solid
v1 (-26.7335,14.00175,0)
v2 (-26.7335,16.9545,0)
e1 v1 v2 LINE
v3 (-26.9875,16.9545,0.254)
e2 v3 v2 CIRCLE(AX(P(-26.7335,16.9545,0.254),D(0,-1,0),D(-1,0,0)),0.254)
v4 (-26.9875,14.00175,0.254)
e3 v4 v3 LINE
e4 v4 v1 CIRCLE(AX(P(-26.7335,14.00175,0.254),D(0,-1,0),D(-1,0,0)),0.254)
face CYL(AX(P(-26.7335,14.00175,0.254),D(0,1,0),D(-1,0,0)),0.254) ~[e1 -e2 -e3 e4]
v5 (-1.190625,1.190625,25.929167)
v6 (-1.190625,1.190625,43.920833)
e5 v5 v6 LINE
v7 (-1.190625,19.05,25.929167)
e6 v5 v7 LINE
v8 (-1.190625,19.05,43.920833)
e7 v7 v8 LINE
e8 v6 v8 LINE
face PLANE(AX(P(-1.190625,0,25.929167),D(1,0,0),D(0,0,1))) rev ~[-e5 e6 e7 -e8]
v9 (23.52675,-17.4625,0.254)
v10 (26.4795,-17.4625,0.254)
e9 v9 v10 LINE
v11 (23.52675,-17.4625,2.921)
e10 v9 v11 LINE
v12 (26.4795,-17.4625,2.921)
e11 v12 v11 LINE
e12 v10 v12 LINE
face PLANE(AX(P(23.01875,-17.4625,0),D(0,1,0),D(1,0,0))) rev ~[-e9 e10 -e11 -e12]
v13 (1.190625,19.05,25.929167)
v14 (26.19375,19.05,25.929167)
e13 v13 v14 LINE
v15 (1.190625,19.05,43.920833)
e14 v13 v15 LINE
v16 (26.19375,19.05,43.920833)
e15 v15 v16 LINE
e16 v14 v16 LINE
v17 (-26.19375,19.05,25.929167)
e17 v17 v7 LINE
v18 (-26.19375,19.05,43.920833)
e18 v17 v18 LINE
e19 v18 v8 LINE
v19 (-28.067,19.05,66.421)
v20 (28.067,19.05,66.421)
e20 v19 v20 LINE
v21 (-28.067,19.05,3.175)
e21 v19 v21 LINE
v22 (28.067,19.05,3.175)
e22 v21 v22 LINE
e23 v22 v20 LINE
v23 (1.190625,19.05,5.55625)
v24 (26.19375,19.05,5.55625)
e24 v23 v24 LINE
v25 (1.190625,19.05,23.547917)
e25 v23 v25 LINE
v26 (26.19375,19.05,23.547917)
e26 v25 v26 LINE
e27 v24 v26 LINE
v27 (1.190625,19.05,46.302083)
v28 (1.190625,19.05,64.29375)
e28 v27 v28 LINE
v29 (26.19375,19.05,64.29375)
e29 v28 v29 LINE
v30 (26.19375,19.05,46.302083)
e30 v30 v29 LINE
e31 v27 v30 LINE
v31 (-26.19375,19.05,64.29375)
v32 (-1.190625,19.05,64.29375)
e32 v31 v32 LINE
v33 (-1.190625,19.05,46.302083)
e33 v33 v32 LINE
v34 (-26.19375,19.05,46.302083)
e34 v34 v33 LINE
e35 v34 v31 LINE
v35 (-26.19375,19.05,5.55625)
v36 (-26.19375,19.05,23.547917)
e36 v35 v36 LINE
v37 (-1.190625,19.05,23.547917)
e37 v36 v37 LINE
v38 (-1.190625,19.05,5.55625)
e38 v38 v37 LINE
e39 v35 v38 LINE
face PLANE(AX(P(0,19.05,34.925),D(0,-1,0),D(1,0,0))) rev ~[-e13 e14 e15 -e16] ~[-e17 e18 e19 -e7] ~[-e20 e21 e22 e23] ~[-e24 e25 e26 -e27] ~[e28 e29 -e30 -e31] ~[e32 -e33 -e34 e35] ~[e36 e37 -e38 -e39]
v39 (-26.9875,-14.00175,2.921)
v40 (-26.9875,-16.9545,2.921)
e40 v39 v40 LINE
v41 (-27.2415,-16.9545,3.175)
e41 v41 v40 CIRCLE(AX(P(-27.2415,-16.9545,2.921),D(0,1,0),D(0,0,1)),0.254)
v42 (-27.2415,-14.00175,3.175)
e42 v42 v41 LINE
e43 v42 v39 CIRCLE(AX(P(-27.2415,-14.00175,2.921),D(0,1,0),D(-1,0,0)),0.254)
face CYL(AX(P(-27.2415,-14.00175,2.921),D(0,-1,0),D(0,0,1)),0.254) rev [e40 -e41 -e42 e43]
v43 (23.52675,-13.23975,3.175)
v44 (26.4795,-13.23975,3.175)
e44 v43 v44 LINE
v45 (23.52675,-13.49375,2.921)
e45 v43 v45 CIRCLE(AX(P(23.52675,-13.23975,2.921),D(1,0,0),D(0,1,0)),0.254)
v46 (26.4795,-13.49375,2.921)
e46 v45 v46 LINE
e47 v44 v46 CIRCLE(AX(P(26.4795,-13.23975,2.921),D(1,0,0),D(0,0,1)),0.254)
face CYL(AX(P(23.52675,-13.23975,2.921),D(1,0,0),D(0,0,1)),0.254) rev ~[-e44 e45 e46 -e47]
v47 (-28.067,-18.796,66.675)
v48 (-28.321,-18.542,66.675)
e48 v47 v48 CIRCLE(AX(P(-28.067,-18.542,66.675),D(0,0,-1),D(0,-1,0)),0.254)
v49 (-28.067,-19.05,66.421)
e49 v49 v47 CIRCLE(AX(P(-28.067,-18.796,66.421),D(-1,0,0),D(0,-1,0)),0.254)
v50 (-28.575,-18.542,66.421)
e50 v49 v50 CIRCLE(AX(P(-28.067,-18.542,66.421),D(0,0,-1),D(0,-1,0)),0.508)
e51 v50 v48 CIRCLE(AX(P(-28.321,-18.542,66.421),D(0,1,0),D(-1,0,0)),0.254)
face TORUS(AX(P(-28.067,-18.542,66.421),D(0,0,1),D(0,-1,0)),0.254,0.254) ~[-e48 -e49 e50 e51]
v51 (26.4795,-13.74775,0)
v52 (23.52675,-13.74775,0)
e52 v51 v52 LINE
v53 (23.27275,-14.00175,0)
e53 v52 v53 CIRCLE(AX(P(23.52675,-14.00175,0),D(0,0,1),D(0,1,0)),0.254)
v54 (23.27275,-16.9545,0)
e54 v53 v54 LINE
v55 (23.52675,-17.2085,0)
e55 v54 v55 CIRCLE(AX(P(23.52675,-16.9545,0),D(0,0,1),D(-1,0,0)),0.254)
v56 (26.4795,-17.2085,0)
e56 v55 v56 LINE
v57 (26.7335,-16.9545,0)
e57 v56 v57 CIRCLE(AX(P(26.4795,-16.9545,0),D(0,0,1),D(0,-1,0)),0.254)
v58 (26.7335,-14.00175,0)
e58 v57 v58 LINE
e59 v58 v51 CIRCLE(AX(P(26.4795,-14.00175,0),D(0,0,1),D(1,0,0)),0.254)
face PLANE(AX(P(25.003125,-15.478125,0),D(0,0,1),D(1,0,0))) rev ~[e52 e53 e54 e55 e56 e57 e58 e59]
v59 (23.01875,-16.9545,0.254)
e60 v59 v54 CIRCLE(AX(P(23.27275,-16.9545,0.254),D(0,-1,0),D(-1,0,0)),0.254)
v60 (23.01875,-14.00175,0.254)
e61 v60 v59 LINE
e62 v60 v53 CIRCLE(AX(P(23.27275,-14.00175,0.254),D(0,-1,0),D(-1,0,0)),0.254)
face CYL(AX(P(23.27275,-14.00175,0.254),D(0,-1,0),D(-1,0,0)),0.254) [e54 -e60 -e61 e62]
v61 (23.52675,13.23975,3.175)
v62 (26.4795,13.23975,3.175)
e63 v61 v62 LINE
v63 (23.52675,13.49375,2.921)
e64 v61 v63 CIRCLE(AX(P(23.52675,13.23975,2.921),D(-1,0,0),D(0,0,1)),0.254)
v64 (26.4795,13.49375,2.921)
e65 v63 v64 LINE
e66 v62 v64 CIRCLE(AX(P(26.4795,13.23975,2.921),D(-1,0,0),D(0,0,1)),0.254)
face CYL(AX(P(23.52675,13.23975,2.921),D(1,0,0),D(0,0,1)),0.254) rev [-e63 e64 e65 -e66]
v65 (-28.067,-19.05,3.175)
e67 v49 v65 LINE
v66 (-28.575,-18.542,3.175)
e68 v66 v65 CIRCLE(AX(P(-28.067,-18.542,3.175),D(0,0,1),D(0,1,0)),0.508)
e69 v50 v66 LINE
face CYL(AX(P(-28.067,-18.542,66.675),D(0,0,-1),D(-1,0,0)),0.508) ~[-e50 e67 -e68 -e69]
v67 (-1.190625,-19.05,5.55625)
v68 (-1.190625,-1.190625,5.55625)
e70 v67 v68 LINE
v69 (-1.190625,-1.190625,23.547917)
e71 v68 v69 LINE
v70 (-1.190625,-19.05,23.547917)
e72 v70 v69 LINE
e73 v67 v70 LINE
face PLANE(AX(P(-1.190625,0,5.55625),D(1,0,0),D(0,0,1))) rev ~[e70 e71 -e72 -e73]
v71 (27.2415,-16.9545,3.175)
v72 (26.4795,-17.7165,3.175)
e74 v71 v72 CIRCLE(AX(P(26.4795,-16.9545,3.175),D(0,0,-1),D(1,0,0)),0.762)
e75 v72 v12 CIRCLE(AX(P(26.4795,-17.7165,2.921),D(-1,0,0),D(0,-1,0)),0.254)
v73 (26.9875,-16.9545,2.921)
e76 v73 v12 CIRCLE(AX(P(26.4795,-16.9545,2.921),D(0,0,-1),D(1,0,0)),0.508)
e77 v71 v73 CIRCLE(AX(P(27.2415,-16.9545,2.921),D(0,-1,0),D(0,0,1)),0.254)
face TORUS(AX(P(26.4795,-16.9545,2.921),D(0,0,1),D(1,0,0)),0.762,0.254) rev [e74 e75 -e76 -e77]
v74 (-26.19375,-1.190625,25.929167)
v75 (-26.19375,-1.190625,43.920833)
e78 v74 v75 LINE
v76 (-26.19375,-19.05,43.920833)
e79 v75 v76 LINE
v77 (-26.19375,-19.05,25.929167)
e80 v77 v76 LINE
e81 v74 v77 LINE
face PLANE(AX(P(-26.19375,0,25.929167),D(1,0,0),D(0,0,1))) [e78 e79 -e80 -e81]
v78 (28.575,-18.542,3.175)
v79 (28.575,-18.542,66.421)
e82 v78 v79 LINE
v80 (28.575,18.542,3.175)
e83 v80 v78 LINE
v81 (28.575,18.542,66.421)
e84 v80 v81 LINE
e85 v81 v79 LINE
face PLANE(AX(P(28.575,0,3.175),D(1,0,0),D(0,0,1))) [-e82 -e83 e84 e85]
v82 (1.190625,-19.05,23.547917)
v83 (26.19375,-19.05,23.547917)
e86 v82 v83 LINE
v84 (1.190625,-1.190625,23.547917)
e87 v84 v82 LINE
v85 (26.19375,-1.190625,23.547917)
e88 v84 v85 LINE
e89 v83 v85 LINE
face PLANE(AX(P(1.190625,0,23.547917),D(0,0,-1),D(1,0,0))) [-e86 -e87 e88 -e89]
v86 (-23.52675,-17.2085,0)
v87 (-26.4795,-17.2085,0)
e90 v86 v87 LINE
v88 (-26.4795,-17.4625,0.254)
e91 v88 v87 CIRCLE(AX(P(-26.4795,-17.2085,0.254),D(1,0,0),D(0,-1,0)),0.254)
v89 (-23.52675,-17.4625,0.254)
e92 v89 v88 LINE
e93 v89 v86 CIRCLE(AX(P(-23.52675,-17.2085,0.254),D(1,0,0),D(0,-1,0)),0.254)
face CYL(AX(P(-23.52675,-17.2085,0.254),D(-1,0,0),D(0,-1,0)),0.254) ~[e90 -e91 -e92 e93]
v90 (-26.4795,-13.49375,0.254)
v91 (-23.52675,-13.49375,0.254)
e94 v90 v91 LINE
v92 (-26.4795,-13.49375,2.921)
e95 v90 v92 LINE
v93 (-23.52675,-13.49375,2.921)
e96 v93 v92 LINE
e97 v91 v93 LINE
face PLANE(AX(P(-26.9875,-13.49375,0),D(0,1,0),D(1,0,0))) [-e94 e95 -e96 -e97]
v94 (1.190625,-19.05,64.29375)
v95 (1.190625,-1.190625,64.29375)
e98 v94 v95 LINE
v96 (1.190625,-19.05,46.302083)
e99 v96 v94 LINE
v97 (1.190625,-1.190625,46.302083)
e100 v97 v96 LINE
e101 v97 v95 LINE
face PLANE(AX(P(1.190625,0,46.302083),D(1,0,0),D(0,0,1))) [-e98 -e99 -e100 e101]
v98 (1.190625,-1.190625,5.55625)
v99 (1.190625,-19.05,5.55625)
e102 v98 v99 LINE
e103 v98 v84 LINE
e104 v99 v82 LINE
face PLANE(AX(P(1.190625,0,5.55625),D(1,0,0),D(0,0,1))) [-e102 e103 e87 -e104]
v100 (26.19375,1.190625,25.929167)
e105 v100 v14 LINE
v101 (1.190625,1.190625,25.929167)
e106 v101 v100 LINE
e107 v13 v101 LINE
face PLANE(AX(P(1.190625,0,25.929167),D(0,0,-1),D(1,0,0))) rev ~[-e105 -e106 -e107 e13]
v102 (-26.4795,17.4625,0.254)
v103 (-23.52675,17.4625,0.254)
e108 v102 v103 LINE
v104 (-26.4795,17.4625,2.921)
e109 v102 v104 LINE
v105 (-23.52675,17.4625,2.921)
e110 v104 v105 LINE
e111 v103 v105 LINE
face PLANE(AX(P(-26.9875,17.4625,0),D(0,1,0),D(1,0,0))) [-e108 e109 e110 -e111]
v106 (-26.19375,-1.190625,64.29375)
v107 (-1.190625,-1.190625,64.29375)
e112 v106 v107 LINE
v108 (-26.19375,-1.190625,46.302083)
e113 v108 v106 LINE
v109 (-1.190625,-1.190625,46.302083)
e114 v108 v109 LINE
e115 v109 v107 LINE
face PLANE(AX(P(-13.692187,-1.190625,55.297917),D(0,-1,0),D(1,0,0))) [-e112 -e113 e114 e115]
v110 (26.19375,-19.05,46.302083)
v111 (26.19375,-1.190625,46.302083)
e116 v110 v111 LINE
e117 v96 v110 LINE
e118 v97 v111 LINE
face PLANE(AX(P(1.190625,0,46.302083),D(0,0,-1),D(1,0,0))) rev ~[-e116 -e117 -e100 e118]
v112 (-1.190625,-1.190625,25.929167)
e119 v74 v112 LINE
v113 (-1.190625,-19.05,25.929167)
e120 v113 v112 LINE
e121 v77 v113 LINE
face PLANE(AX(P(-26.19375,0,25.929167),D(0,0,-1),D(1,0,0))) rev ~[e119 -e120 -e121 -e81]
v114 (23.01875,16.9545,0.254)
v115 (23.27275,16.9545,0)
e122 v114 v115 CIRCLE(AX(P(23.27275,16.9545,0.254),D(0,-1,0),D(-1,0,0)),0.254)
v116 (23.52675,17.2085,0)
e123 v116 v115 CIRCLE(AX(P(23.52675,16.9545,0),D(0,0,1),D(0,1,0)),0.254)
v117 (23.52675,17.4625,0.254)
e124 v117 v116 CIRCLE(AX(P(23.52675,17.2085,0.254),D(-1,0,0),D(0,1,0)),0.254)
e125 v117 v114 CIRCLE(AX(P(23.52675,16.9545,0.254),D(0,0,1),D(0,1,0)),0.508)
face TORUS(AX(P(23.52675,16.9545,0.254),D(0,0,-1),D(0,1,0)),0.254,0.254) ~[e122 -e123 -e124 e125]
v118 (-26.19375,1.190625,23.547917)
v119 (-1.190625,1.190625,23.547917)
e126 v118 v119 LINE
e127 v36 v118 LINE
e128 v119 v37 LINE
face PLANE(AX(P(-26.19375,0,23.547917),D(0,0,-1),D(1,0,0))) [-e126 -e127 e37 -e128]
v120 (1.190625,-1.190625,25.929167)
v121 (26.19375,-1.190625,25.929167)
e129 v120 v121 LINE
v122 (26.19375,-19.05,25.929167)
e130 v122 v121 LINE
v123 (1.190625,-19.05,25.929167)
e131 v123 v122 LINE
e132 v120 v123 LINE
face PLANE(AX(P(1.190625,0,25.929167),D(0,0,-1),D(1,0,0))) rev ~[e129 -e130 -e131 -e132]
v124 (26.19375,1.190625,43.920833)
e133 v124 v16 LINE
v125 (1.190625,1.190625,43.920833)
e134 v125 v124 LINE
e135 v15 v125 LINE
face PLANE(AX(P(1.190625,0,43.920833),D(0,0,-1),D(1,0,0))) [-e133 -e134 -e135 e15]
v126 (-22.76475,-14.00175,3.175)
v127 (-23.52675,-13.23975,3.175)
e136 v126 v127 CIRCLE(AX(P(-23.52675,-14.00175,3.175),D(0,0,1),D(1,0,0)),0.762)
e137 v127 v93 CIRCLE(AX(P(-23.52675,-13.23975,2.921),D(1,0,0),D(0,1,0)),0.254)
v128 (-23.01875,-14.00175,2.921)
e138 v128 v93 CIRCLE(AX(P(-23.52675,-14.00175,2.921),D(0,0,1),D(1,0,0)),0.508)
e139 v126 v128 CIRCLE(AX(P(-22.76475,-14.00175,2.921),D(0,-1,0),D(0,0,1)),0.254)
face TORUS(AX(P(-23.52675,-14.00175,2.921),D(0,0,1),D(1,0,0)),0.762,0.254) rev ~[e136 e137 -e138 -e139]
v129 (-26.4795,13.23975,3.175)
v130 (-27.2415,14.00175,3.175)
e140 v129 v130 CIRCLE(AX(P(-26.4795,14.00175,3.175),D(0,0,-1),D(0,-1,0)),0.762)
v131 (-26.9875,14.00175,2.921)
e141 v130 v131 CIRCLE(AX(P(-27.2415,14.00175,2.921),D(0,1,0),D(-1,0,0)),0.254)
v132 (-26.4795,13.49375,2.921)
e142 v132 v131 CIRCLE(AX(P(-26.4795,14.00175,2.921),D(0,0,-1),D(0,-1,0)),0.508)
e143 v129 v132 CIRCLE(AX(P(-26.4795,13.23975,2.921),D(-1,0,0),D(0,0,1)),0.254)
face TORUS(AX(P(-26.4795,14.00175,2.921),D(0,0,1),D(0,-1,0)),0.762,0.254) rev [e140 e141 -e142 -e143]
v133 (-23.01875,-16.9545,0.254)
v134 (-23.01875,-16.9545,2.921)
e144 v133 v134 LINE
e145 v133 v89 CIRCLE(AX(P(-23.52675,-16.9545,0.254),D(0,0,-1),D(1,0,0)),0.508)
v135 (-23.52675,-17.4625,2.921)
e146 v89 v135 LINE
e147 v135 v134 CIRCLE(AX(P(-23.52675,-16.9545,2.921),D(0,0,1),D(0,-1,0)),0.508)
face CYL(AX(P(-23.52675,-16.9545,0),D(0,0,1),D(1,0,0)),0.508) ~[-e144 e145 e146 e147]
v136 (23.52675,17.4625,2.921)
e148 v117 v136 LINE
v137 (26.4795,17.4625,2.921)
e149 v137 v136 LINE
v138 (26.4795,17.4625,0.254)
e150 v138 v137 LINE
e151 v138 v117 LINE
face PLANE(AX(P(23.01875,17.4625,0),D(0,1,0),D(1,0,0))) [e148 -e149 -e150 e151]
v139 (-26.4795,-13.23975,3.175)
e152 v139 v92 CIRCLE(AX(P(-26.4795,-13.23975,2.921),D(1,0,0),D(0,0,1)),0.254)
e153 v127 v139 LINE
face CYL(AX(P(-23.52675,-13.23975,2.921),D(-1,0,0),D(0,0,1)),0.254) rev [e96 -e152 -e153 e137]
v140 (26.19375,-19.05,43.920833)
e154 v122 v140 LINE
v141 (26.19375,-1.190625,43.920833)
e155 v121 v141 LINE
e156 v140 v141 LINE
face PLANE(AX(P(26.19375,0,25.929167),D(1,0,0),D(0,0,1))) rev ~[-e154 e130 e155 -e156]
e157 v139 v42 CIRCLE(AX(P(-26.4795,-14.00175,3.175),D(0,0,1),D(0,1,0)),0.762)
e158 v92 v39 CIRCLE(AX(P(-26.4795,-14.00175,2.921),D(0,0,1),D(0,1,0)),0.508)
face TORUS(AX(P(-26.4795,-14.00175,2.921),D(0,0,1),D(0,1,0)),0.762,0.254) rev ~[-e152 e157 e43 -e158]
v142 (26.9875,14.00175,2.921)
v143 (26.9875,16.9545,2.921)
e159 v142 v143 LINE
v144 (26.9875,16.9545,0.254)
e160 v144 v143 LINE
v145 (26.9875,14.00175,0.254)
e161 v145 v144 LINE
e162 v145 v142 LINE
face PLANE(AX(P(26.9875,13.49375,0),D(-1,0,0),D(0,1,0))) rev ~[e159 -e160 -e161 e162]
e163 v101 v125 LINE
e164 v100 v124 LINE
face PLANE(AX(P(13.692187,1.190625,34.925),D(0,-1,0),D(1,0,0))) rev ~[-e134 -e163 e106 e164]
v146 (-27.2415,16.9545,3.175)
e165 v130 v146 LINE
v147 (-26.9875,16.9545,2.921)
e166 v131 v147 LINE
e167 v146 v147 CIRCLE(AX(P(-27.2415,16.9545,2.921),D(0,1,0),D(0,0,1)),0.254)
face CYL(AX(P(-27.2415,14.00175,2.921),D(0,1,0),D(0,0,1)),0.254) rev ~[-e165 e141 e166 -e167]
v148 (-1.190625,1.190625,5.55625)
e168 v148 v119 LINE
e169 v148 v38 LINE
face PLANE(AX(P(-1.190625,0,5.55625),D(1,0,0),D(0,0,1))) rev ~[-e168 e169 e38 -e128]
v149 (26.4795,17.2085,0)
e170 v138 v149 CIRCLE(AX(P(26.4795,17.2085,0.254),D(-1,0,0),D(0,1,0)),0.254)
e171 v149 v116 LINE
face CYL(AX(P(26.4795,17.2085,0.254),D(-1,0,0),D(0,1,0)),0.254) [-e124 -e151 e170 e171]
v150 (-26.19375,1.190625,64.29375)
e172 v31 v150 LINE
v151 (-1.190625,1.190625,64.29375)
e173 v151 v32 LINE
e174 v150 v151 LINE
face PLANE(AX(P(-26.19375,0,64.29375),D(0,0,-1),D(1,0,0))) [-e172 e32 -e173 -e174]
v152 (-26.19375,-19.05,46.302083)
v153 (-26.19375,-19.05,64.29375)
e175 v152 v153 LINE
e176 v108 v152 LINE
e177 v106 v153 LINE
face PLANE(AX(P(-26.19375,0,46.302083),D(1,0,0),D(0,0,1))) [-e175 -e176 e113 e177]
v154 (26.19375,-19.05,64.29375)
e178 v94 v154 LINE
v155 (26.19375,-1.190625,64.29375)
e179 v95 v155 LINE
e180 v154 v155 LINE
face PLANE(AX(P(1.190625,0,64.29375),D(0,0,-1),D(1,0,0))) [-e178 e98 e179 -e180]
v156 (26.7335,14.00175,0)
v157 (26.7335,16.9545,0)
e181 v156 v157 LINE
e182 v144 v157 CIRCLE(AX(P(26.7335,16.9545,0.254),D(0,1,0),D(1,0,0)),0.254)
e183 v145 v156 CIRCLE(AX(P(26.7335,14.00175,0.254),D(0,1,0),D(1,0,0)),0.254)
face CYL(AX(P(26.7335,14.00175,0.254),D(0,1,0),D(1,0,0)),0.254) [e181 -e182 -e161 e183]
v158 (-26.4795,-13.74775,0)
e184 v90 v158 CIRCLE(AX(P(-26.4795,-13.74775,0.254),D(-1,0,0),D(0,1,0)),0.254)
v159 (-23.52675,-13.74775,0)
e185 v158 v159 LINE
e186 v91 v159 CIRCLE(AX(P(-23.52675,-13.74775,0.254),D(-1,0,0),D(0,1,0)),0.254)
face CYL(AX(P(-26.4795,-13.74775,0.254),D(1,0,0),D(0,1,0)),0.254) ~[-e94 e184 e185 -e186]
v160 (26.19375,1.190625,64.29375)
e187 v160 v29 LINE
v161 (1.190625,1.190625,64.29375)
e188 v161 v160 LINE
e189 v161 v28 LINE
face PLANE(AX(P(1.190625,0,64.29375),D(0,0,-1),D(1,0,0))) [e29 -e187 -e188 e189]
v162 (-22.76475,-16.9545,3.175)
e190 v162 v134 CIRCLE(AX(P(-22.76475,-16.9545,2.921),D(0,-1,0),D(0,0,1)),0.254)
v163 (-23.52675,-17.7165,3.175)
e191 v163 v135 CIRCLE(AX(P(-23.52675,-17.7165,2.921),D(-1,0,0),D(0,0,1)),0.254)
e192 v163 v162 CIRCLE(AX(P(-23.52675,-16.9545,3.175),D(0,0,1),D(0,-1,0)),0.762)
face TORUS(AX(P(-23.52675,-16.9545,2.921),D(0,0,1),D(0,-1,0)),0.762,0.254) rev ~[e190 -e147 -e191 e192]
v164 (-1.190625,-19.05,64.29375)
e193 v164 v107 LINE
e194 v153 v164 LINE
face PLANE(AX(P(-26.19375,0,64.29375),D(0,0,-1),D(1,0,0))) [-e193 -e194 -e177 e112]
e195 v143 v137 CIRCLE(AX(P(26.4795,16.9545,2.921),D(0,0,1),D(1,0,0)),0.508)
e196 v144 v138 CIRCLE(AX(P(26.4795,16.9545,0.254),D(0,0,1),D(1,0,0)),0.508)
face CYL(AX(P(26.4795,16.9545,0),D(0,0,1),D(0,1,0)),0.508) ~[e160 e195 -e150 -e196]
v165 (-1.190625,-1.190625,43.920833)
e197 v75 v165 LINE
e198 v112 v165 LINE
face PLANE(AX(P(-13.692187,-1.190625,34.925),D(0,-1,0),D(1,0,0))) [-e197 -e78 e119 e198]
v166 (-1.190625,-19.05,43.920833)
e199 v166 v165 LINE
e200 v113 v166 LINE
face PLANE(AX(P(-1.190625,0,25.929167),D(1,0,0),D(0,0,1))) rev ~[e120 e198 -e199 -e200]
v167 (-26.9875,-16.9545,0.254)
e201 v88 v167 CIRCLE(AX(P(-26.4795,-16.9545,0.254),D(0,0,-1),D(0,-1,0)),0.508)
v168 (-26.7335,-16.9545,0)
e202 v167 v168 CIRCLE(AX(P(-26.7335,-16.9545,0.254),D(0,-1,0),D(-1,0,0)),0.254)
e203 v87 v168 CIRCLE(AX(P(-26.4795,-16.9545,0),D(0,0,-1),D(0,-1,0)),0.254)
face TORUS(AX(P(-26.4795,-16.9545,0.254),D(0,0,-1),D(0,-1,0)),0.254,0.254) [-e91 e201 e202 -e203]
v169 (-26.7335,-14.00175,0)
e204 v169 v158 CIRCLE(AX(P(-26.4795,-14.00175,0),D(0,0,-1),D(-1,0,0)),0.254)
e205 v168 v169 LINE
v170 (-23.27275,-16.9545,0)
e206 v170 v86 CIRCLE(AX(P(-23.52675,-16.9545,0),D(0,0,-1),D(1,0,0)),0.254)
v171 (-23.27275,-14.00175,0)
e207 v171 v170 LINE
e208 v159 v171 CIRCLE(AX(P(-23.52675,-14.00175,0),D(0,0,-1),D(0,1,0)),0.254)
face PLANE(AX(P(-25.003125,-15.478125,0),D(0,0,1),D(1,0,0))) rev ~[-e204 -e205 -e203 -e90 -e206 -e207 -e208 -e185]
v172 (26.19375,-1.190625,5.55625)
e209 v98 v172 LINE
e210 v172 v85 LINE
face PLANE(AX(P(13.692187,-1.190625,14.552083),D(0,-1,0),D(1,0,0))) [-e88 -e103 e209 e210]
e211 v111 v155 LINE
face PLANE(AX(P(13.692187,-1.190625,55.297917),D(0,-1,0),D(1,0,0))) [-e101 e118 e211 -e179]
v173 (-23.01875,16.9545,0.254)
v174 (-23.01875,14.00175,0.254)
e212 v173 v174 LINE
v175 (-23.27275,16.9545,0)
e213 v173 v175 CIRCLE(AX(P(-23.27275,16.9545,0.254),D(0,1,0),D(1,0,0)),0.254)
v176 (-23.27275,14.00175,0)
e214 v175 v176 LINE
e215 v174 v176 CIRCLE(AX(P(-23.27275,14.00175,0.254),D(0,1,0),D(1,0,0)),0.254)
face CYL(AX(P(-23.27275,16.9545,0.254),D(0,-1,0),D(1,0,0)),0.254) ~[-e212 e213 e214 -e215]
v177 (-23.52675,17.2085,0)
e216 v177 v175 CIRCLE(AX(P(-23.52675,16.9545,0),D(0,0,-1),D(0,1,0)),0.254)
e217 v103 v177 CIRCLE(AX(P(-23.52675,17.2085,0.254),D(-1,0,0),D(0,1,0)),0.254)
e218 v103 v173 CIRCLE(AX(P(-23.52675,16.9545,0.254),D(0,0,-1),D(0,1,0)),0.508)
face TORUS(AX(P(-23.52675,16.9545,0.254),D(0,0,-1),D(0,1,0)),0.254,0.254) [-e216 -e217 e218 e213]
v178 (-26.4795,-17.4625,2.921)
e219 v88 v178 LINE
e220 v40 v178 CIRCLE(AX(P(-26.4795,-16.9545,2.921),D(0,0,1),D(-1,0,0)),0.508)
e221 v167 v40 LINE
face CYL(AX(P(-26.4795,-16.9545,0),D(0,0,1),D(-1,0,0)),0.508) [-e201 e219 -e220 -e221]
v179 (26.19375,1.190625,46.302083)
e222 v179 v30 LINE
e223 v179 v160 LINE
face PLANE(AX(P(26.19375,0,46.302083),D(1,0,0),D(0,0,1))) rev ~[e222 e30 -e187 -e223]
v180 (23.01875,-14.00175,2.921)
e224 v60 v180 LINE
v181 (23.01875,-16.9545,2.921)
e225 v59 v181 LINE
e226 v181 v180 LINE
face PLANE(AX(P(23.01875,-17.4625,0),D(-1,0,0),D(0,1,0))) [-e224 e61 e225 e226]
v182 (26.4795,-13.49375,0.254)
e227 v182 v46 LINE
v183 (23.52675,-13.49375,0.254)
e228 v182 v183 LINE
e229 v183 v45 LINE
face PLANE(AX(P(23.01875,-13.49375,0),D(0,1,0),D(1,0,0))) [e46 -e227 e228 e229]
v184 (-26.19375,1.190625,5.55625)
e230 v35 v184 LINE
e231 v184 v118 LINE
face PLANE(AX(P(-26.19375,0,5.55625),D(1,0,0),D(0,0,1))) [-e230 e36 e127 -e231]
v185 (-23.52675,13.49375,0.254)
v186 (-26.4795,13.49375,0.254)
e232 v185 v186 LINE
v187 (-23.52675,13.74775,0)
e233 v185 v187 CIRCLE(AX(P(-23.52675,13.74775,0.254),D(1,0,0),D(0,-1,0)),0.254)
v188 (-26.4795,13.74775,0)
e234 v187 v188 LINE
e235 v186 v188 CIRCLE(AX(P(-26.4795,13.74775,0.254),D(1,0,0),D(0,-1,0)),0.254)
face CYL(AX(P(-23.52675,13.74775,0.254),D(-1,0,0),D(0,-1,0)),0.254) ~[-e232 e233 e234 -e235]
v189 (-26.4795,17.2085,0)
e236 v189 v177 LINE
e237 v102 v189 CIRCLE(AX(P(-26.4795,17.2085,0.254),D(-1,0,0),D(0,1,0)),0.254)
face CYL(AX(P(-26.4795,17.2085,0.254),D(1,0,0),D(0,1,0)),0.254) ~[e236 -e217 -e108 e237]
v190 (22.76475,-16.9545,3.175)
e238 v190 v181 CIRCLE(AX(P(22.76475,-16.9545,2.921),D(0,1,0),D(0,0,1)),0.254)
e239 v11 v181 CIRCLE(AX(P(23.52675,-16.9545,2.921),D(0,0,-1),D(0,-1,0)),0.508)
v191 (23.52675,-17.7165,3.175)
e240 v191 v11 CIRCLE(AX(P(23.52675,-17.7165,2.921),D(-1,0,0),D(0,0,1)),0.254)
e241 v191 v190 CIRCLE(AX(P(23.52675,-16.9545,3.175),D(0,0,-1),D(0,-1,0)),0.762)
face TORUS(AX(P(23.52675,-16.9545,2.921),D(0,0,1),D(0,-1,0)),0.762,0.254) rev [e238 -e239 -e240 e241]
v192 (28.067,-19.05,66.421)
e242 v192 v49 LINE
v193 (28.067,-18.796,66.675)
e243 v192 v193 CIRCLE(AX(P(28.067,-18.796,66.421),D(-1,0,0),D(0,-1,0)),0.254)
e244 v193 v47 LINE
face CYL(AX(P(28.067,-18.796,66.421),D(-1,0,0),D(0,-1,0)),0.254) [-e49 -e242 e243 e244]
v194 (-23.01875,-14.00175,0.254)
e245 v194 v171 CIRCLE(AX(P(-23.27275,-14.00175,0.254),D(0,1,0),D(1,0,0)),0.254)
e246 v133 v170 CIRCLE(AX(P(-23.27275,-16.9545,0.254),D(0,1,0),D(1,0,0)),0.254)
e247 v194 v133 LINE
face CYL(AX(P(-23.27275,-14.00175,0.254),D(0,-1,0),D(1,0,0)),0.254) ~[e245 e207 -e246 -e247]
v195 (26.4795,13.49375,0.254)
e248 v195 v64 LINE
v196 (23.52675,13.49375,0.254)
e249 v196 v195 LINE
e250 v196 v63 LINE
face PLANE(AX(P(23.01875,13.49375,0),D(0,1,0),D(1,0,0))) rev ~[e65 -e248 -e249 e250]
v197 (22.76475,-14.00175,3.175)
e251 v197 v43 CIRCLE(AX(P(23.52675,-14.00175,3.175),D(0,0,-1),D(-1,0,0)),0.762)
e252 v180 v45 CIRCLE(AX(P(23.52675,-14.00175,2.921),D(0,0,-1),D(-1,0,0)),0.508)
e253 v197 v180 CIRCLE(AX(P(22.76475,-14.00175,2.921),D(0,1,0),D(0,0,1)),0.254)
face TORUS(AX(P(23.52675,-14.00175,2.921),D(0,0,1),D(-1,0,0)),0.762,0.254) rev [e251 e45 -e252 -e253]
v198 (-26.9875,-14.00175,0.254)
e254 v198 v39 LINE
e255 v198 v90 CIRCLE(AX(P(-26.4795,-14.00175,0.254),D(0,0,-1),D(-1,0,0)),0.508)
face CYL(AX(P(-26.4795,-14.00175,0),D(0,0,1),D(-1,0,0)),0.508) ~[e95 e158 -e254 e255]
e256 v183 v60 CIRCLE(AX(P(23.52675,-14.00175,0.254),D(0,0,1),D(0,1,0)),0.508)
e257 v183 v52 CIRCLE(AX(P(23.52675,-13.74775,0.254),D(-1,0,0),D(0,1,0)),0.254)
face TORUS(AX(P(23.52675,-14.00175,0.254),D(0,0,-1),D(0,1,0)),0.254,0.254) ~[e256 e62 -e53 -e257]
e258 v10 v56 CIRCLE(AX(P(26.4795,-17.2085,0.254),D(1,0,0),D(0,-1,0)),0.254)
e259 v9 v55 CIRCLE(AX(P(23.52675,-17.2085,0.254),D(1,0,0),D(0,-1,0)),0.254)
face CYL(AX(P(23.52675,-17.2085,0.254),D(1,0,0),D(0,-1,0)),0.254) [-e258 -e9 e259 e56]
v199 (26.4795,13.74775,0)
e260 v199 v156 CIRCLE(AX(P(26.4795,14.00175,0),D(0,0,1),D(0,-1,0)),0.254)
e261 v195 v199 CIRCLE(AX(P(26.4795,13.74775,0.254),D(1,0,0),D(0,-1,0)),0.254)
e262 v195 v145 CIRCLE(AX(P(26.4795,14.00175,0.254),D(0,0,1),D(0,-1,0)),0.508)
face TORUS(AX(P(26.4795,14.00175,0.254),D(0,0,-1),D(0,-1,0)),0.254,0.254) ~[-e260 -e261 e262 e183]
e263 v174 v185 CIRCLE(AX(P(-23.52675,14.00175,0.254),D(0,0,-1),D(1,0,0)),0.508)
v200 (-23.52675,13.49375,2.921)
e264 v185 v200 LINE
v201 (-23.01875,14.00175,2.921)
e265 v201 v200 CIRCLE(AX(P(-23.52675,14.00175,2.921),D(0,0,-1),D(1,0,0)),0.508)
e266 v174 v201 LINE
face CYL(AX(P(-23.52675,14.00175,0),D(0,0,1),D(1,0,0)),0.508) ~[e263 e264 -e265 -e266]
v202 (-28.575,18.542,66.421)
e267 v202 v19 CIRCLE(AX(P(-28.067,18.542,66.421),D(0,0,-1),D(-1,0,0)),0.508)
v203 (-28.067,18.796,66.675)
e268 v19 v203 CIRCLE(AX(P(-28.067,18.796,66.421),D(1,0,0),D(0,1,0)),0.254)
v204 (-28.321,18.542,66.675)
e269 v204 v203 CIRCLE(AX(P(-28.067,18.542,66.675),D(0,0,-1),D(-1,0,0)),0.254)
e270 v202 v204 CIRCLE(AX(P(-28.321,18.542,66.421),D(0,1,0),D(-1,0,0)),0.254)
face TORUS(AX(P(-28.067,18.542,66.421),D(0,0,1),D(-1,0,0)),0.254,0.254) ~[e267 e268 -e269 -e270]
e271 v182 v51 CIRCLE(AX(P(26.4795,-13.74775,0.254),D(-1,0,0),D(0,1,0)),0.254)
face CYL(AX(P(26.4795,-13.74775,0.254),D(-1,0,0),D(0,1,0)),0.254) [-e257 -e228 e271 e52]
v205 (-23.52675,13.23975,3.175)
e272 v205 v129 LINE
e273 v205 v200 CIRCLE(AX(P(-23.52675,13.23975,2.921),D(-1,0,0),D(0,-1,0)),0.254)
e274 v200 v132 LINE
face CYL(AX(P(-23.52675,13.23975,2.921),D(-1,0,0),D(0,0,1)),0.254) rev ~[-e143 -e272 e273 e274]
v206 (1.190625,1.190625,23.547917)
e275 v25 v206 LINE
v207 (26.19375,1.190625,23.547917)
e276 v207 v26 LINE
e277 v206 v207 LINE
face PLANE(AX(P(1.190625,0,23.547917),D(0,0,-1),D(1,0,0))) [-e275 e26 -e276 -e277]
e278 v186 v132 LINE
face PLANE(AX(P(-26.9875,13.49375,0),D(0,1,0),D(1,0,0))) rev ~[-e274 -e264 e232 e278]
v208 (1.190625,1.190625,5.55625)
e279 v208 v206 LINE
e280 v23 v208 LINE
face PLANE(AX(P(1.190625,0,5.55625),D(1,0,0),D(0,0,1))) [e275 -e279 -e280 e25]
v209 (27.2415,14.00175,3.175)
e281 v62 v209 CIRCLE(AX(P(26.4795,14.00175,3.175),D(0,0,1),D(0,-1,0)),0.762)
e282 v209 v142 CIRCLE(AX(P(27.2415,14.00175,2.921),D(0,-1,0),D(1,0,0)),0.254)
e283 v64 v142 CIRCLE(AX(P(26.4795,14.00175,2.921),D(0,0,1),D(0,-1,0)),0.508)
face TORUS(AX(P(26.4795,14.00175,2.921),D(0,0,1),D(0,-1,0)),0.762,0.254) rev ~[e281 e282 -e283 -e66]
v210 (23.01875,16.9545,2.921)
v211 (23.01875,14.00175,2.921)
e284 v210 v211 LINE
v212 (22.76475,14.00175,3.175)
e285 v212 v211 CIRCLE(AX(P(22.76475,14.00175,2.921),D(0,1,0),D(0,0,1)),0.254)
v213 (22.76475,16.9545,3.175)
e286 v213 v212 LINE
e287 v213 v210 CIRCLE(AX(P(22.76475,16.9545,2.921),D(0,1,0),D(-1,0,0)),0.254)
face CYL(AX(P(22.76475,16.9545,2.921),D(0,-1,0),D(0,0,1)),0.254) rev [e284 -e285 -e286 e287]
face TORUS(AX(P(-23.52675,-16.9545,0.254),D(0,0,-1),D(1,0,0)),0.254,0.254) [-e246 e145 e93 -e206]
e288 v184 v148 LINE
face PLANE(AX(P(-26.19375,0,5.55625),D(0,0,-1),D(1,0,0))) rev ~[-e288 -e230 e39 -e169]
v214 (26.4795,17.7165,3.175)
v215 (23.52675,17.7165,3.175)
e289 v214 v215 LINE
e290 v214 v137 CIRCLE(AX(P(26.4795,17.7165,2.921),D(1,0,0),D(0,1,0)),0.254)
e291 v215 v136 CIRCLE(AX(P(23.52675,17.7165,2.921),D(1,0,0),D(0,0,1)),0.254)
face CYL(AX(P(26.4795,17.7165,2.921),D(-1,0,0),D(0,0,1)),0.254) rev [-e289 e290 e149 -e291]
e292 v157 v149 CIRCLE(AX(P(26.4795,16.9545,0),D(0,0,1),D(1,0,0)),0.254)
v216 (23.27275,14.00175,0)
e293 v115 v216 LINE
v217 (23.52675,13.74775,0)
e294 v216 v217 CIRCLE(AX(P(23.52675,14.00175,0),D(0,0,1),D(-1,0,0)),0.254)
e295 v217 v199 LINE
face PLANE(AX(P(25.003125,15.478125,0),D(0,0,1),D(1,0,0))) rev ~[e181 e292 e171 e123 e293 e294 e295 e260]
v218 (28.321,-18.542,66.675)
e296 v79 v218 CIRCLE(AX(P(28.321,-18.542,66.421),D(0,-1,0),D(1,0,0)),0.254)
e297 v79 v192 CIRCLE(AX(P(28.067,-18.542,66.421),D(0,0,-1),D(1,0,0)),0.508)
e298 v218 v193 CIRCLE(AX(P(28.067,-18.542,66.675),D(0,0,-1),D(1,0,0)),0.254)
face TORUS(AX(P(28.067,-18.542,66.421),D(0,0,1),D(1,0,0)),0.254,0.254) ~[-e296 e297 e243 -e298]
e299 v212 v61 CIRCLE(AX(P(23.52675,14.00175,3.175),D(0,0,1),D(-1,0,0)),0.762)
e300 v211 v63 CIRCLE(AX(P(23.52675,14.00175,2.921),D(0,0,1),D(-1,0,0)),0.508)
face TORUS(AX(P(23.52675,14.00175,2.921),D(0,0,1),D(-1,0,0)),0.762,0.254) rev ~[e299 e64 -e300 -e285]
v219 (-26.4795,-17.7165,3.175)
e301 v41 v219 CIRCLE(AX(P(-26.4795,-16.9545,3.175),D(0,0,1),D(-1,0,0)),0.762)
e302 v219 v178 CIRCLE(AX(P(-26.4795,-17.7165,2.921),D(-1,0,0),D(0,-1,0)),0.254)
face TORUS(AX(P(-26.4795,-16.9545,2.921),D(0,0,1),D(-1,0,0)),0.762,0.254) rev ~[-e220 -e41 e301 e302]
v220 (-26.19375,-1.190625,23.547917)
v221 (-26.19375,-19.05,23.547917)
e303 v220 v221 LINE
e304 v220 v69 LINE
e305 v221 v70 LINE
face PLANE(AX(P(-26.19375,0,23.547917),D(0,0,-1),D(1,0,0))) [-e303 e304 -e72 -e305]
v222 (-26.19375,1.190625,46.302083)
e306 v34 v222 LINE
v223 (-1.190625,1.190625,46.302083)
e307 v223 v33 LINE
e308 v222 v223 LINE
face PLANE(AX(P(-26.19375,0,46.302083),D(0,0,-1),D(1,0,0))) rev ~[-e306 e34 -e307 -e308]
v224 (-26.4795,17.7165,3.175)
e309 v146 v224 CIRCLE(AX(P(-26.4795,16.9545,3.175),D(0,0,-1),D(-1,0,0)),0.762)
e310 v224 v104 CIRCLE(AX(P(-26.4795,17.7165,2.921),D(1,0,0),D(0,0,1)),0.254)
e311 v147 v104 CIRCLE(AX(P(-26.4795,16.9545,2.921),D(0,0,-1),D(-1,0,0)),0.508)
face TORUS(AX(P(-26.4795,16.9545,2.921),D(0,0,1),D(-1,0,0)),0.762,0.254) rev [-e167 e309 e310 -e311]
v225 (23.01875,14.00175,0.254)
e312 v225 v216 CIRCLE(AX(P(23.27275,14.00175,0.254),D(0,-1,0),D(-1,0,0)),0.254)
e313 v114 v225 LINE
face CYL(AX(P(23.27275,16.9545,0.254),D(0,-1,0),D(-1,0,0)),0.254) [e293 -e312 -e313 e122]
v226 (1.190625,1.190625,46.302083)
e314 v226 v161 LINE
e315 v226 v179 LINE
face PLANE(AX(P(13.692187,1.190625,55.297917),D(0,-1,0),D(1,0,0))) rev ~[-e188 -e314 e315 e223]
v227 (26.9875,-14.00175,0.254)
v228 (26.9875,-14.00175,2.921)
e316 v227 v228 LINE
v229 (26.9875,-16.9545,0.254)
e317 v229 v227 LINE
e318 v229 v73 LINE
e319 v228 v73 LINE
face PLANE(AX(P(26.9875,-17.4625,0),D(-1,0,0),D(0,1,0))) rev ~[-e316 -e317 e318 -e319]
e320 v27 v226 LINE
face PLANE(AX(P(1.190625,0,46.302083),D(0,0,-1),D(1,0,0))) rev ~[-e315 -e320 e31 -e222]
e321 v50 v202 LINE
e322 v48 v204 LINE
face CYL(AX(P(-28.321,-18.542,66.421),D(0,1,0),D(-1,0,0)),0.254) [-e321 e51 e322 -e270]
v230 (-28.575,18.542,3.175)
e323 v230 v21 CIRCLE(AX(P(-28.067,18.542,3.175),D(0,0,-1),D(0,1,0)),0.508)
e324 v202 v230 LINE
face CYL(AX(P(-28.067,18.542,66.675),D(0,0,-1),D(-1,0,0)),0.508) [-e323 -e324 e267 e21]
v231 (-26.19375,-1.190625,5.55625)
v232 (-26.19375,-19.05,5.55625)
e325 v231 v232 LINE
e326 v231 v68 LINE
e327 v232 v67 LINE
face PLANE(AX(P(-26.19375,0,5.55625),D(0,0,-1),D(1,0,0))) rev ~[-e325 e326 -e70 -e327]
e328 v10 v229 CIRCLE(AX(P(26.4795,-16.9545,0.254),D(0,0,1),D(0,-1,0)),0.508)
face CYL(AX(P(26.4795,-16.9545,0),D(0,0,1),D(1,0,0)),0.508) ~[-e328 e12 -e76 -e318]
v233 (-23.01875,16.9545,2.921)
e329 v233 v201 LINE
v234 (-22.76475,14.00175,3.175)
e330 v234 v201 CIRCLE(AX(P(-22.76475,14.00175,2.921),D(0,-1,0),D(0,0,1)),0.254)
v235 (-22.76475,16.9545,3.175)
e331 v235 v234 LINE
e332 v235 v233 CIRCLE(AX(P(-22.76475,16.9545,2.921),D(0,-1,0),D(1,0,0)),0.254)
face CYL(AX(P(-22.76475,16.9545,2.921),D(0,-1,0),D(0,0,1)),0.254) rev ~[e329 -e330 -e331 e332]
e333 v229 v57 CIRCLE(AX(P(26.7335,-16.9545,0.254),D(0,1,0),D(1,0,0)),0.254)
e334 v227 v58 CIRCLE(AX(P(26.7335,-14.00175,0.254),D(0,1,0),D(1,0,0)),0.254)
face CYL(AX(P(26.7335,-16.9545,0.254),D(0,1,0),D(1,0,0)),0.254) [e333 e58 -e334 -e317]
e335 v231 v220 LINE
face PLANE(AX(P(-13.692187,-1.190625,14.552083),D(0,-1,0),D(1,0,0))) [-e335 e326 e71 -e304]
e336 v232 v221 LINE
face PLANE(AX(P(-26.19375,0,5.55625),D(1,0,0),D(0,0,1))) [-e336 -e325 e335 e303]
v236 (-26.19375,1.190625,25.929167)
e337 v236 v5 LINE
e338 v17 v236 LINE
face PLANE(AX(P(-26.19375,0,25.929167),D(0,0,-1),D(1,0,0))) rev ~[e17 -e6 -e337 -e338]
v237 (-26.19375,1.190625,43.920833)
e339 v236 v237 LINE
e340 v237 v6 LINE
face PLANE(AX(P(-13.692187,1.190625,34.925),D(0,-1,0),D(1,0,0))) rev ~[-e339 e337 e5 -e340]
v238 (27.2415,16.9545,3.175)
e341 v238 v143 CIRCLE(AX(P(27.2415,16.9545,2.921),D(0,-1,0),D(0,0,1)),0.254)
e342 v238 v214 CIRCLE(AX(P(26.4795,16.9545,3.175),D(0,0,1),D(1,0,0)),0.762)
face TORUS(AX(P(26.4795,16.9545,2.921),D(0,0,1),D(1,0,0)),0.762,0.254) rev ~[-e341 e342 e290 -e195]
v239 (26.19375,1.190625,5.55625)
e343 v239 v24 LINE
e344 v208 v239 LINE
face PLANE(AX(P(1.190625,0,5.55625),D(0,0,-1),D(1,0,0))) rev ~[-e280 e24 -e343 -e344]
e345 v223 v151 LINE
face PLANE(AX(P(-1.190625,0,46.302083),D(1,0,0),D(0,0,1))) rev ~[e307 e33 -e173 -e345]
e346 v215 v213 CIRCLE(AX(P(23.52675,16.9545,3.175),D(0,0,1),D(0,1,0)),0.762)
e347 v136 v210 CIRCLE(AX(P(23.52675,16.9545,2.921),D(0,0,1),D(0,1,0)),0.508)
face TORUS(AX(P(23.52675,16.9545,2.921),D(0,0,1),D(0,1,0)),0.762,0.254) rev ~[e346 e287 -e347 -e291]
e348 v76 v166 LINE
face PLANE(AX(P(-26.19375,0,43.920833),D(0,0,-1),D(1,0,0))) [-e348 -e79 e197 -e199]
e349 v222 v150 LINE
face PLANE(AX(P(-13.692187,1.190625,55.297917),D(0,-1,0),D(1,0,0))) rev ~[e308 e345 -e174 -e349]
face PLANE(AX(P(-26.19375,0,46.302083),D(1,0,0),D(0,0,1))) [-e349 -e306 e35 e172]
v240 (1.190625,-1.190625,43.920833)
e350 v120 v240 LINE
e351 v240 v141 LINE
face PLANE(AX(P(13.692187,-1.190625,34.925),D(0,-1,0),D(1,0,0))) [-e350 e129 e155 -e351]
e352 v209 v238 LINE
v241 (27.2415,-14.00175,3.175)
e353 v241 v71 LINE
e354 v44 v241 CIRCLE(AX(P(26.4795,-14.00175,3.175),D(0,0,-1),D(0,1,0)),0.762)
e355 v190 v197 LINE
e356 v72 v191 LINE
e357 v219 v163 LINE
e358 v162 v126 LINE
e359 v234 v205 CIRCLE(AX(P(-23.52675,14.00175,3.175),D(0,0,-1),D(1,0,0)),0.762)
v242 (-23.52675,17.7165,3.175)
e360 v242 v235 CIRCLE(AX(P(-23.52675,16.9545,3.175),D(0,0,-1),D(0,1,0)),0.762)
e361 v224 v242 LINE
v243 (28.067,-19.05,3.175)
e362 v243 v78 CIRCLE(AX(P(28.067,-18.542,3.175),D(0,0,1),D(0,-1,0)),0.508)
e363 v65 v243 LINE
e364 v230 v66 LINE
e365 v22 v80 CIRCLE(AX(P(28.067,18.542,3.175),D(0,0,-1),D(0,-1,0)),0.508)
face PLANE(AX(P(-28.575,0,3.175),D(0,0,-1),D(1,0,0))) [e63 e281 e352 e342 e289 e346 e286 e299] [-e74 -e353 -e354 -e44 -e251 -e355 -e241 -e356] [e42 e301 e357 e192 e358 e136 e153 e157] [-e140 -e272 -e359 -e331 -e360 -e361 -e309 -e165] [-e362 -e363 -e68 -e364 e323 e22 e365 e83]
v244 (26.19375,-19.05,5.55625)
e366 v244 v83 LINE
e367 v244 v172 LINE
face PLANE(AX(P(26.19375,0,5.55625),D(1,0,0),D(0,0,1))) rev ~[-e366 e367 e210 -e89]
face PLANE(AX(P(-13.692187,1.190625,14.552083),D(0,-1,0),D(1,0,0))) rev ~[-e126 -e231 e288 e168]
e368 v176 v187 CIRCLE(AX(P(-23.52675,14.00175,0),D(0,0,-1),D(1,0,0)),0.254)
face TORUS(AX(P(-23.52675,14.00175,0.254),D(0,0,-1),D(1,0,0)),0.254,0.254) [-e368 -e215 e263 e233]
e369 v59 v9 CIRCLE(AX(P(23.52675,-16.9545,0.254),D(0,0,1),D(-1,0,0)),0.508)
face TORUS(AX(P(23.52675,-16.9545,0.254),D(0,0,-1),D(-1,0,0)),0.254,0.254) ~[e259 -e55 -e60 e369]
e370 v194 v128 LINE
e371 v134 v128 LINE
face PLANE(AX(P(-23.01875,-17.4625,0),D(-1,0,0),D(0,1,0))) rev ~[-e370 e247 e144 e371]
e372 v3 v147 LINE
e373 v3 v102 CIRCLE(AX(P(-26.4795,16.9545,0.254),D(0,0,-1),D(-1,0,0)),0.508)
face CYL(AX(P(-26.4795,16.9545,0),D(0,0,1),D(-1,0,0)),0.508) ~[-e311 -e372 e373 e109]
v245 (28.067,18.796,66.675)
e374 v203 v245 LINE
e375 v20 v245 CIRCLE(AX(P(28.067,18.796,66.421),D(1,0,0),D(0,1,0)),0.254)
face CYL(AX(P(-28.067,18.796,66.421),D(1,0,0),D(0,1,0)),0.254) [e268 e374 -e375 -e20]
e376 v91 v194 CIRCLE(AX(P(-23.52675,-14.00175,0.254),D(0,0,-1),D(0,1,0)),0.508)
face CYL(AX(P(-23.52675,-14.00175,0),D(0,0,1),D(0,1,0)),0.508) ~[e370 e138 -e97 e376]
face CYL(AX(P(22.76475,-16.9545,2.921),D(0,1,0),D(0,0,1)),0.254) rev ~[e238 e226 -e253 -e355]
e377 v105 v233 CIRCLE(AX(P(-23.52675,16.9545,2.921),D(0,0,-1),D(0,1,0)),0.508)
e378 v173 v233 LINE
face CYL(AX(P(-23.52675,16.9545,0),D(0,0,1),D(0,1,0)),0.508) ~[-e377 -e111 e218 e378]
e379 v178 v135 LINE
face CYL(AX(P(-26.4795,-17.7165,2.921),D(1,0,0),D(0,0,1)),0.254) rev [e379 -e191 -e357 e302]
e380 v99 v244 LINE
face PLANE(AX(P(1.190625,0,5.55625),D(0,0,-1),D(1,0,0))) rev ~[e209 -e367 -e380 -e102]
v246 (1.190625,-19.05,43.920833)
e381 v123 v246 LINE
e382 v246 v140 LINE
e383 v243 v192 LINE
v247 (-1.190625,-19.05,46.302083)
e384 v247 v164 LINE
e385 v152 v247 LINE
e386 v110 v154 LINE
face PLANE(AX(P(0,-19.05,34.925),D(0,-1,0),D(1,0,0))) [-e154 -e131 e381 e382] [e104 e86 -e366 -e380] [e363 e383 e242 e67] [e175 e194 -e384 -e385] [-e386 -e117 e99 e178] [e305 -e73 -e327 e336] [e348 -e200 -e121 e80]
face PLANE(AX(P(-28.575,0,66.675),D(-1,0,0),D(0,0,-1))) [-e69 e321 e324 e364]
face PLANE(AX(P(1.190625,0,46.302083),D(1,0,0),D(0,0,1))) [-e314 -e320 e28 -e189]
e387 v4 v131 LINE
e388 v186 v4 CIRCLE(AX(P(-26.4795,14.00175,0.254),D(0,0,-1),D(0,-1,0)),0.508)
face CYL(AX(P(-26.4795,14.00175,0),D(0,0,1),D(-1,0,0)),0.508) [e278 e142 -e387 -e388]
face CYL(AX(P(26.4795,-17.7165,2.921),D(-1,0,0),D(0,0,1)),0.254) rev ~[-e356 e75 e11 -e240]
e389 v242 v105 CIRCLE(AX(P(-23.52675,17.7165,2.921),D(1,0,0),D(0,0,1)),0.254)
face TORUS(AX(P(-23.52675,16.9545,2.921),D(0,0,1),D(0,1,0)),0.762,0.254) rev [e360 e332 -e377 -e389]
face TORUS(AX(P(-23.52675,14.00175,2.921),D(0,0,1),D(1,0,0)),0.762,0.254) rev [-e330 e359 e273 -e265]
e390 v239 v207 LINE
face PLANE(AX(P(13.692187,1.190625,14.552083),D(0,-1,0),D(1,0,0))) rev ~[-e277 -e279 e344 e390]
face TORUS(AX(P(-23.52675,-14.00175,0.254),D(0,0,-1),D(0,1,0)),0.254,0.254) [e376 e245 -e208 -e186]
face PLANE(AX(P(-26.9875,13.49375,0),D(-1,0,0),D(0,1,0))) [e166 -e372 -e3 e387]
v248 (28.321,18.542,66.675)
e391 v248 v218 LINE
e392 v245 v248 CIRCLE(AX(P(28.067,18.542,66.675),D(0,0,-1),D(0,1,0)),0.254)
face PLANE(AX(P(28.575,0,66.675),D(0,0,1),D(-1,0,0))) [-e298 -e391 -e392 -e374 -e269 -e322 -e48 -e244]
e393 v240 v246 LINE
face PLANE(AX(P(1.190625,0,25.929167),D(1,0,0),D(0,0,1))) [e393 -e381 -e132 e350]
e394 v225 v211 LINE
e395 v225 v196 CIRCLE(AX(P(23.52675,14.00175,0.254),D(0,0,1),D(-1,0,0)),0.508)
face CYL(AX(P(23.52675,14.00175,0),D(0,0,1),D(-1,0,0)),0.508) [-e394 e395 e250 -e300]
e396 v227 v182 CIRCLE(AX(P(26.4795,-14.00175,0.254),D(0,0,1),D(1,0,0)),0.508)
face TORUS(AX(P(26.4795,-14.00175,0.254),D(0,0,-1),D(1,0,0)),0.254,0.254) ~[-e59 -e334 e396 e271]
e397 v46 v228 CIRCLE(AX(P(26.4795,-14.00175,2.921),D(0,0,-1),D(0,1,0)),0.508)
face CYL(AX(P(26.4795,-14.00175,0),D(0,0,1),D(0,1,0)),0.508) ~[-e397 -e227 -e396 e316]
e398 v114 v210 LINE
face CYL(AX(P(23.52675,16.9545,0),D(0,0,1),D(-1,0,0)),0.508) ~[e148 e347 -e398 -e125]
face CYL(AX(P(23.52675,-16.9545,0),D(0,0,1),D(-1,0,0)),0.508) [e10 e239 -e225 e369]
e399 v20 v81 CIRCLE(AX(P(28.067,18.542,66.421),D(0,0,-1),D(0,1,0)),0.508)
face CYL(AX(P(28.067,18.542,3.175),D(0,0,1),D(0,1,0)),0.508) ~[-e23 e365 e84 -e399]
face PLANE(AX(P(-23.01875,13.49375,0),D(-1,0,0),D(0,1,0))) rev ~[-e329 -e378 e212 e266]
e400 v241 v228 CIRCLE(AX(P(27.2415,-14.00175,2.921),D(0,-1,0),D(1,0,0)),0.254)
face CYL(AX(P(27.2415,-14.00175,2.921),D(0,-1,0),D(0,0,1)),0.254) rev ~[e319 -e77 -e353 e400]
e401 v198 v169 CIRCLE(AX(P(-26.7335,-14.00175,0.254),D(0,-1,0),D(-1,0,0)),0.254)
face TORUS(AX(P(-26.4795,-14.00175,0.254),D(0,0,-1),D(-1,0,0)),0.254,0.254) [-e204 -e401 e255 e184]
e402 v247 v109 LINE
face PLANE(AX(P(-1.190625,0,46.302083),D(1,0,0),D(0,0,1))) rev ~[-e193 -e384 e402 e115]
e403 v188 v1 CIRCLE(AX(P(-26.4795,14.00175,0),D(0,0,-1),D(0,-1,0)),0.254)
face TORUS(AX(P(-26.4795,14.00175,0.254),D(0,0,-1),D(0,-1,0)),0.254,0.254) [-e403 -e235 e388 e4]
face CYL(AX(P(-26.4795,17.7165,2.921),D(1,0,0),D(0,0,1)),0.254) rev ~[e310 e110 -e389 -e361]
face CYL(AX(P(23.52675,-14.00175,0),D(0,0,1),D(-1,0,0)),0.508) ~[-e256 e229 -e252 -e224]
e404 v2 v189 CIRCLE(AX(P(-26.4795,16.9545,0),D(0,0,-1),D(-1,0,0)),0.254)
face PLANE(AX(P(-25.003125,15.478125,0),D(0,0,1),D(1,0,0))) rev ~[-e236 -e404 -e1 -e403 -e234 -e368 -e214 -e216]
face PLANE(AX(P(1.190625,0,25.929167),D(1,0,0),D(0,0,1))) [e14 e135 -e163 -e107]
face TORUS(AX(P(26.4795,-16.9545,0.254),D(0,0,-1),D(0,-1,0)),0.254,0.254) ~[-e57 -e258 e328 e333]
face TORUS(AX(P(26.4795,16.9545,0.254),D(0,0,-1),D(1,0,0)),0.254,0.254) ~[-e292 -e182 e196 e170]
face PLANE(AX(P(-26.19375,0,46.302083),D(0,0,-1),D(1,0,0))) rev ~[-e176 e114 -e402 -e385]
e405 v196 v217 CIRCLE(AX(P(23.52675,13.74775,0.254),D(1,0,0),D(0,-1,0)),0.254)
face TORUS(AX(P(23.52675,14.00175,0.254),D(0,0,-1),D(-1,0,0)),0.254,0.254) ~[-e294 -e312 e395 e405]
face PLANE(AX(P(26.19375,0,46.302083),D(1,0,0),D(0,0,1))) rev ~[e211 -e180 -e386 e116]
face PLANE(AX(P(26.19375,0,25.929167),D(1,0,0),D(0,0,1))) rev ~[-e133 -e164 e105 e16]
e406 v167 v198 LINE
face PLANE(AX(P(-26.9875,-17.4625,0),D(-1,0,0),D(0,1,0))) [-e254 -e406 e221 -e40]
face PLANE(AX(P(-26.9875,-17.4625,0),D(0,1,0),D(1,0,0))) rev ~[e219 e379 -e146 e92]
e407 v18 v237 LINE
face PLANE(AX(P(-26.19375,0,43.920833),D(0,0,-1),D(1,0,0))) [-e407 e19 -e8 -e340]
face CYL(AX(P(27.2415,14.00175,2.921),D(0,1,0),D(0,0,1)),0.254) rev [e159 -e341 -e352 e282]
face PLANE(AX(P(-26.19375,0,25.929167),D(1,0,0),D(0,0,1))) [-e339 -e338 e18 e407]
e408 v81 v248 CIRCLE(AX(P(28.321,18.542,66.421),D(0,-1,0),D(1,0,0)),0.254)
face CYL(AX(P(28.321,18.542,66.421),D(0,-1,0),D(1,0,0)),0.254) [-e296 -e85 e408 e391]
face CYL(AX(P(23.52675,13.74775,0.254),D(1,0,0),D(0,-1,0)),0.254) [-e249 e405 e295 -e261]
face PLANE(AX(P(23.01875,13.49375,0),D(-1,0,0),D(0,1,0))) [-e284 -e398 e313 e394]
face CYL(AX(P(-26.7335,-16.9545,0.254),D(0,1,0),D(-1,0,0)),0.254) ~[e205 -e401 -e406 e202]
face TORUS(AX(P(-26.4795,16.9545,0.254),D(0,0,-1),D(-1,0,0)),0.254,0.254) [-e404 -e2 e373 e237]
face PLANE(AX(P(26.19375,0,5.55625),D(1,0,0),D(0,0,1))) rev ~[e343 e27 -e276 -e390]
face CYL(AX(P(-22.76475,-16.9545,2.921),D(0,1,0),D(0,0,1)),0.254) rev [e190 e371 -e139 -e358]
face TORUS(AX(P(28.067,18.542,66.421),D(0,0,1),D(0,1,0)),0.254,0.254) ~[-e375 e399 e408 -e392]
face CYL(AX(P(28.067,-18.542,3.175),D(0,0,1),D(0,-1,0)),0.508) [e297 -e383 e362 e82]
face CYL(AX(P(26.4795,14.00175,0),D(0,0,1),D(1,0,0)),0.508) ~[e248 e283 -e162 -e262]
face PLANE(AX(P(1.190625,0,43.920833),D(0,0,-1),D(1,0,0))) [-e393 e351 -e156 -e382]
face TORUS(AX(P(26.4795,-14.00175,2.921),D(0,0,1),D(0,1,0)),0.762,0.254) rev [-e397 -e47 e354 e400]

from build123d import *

# Parameters (mm, degrees)
F0_W     = 400.05
F0_H     = 287.8666666667
F1_DEPTH = 304.8
F2_DEPTH = 19.05
F3_W     = 63.5
F3_H     = 63.5
F4_DEPTH = 50.8
F5_SCALE = 0.0625
F6_R     = 0.508
F7_R     = 0.254


with BuildPart() as f1:
    # F0 (on Front) → F1 (new body, symmetric)
    with BuildSketch(Plane.XZ):
        Polygon((-457.2, 1066.8), (-457.2, 50.8), (-406.4, 50.8), (-355.6, 50.8), (355.6, 50.8), (406.4, 50.8), (457.2, 50.8), (457.2, 1066.8), align=None)
        with Locations((-219.075, 232.8333333333)):
            Rectangle(F0_W, F0_H, mode=Mode.SUBTRACT)
        with Locations((219.075, 232.8333333333)):
            Rectangle(F0_W, F0_H, mode=Mode.SUBTRACT)
        with Locations((-219.075, 558.8)):
            Rectangle(F0_W, F0_H, mode=Mode.SUBTRACT)
        with Locations((-219.075, 884.7666666667)):
            Rectangle(F0_W, F0_H, mode=Mode.SUBTRACT)
        with Locations((219.075, 558.8)):
            Rectangle(F0_W, F0_H, mode=Mode.SUBTRACT)
        with Locations((219.075, 884.7666666667)):
            Rectangle(F0_W, F0_H, mode=Mode.SUBTRACT)
    extrude(amount=F1_DEPTH, both=True)

    # F0 (on Front) → F2 (join, symmetric)
    with BuildSketch(Plane.XZ):
        with Locations((-219.075, 884.7666666667)):
            Rectangle(F0_W, F0_H)
        with Locations((219.075, 884.7666666667)):
            Rectangle(F0_W, F0_H)
        with Locations((219.075, 558.8)):
            Rectangle(F0_W, F0_H)
        with Locations((-219.075, 558.8)):
            Rectangle(F0_W, F0_H)
        with Locations((219.075, 232.8333333333)):
            Rectangle(F0_W, F0_H)
        with Locations((-219.075, 232.8333333333)):
            Rectangle(F0_W, F0_H)
    extrude(amount=F2_DEPTH, both=True)

    # F3 (on Top) → F4 (join, through all)
    with BuildSketch(Plane.XY):
        with Locations((-400.05, -247.65)):
            Rectangle(F3_W, F3_H)
        with Locations((400.05, -247.65)):
            Rectangle(F3_W, F3_H)
        with Locations((400.05, 247.65)):
            Rectangle(F3_W, F3_H)
        with Locations((-400.05, 247.65)):
            Rectangle(F3_W, F3_H)
    extrude(amount=F4_DEPTH)


with BuildPart() as f1_1:
    # F5: moved
    add(f1.part.scale(F5_SCALE))

    # F6
    f6_edges = [f1_1.edges().sort_by_distance(p)[0] for p in [
        (26.9875, 17.4625, 1.5875),
        (26.9875, 13.49375, 1.5875),
        (23.01875, 17.4625, 1.5875),
        (23.01875, 13.49375, 1.5875),
        (23.01875, -13.49375, 1.5875),
        (26.9875, -13.49375, 1.5875),
        (26.9875, -17.4625, 1.5875),
        (23.01875, -17.4625, 1.5875),
        (-23.01875, -17.4625, 1.5875),
        (-23.01875, -13.49375, 1.5875),
        (-26.9875, -17.4625, 1.5875),
        (-26.9875, -13.49375, 1.5875),
        (-23.01875, 17.4625, 1.5875),
        (-23.01875, 13.49375, 1.5875),
        (-26.9875, 13.49375, 1.5875),
        (-26.9875, 17.4625, 1.5875),
        (-28.575, 19.05, 34.925),
        (-28.575, -19.05, 34.925),
        (28.575, 19.05, 34.925),
        (28.575, -19.05, 34.925),
    ]]
    fillet(f6_edges, radius=F6_R)

    # F7
    f7_edges = [f1_1.edges().sort_by_distance(p)[0] for p in [
        (-28.575, 0, 66.675),
        (-26.9875, 15.478125, 0),
        (-25.003125, -13.49375, 0),
        (25.003125, -17.4625, 0),
        (25.003125, 13.49375, 0),
        (-25.003125, 17.4625, 3.175),
        (-23.16754, 17.31371, 3.175),
        (-26.83871, 17.31371, 3.175),
        (-23.01875, 15.478125, 3.175),
        (-26.9875, 15.478125, 3.175),
        (-23.16754, 13.64254, 3.175),
        (-26.83871, 13.64254, 3.175),
        (-25.003125, 13.49375, 3.175),
        (25.003125, 13.49375, 3.175),
        (23.16754, 13.64254, 3.175),
        (26.83871, 13.64254, 3.175),
        (23.01875, 15.478125, 3.175),
        (26.9875, 15.478125, 3.175),
        (23.16754, 17.31371, 3.175),
        (26.83871, 17.31371, 3.175),
        (25.003125, 17.4625, 3.175),
        (-23.01875, -15.478125, 3.175),
        (-23.16754, -17.31371, 3.175),
        (-23.16754, -13.64254, 3.175),
        (-25.003125, -17.4625, 3.175),
        (-25.003125, -13.49375, 3.175),
        (-26.83871, -17.31371, 3.175),
        (-26.83871, -13.64254, 3.175),
        (-26.9875, -15.478125, 3.175),
        (23.01875, -15.478125, 3.175),
        (23.16754, -13.64254, 3.175),
        (23.16754, -17.31371, 3.175),
        (25.003125, -13.49375, 3.175),
        (25.003125, -17.4625, 3.175),
        (26.83871, -13.64254, 3.175),
        (26.83871, -17.31371, 3.175),
        (26.9875, -15.478125, 3.175),
        (-28.42621, 18.90121, 66.675),
        (-28.42621, -18.90121, 66.675),
        (0, 19.05, 66.675),
        (28.42621, 18.90121, 66.675),
        (28.575, 0, 66.675),
        (28.42621, -18.90121, 66.675),
        (0, -19.05, 66.675),
        (-25.003125, 17.4625, 0),
        (-23.16754, 17.31371, 0),
        (-26.83871, 17.31371, 0),
        (-23.01875, 15.478125, 0),
        (-23.16754, 13.64254, 0),
        (-26.83871, 13.64254, 0),
        (-25.003125, 13.49375, 0),
        (23.16754, 13.64254, 0),
        (26.83871, 13.64254, 0),
        (23.01875, 15.478125, 0),
        (26.9875, 15.478125, 0),
        (23.16754, 17.31371, 0),
        (26.83871, 17.31371, 0),
        (25.003125, 17.4625, 0),
        (-23.01875, -15.478125, 0),
        (-23.16754, -17.31371, 0),
        (-23.16754, -13.64254, 0),
        (-25.003125, -17.4625, 0),
        (-26.83871, -17.31371, 0),
        (-26.83871, -13.64254, 0),
        (-26.9875, -15.478125, 0),
        (23.01875, -15.478125, 0),
        (23.16754, -13.64254, 0),
        (23.16754, -17.31371, 0),
        (25.003125, -13.49375, 0),
        (26.83871, -13.64254, 0),
        (26.83871, -17.31371, 0),
        (26.9875, -15.478125, 0),
    ]]
    fillet(f7_edges, radius=F7_R)


solid = f1_1.part
